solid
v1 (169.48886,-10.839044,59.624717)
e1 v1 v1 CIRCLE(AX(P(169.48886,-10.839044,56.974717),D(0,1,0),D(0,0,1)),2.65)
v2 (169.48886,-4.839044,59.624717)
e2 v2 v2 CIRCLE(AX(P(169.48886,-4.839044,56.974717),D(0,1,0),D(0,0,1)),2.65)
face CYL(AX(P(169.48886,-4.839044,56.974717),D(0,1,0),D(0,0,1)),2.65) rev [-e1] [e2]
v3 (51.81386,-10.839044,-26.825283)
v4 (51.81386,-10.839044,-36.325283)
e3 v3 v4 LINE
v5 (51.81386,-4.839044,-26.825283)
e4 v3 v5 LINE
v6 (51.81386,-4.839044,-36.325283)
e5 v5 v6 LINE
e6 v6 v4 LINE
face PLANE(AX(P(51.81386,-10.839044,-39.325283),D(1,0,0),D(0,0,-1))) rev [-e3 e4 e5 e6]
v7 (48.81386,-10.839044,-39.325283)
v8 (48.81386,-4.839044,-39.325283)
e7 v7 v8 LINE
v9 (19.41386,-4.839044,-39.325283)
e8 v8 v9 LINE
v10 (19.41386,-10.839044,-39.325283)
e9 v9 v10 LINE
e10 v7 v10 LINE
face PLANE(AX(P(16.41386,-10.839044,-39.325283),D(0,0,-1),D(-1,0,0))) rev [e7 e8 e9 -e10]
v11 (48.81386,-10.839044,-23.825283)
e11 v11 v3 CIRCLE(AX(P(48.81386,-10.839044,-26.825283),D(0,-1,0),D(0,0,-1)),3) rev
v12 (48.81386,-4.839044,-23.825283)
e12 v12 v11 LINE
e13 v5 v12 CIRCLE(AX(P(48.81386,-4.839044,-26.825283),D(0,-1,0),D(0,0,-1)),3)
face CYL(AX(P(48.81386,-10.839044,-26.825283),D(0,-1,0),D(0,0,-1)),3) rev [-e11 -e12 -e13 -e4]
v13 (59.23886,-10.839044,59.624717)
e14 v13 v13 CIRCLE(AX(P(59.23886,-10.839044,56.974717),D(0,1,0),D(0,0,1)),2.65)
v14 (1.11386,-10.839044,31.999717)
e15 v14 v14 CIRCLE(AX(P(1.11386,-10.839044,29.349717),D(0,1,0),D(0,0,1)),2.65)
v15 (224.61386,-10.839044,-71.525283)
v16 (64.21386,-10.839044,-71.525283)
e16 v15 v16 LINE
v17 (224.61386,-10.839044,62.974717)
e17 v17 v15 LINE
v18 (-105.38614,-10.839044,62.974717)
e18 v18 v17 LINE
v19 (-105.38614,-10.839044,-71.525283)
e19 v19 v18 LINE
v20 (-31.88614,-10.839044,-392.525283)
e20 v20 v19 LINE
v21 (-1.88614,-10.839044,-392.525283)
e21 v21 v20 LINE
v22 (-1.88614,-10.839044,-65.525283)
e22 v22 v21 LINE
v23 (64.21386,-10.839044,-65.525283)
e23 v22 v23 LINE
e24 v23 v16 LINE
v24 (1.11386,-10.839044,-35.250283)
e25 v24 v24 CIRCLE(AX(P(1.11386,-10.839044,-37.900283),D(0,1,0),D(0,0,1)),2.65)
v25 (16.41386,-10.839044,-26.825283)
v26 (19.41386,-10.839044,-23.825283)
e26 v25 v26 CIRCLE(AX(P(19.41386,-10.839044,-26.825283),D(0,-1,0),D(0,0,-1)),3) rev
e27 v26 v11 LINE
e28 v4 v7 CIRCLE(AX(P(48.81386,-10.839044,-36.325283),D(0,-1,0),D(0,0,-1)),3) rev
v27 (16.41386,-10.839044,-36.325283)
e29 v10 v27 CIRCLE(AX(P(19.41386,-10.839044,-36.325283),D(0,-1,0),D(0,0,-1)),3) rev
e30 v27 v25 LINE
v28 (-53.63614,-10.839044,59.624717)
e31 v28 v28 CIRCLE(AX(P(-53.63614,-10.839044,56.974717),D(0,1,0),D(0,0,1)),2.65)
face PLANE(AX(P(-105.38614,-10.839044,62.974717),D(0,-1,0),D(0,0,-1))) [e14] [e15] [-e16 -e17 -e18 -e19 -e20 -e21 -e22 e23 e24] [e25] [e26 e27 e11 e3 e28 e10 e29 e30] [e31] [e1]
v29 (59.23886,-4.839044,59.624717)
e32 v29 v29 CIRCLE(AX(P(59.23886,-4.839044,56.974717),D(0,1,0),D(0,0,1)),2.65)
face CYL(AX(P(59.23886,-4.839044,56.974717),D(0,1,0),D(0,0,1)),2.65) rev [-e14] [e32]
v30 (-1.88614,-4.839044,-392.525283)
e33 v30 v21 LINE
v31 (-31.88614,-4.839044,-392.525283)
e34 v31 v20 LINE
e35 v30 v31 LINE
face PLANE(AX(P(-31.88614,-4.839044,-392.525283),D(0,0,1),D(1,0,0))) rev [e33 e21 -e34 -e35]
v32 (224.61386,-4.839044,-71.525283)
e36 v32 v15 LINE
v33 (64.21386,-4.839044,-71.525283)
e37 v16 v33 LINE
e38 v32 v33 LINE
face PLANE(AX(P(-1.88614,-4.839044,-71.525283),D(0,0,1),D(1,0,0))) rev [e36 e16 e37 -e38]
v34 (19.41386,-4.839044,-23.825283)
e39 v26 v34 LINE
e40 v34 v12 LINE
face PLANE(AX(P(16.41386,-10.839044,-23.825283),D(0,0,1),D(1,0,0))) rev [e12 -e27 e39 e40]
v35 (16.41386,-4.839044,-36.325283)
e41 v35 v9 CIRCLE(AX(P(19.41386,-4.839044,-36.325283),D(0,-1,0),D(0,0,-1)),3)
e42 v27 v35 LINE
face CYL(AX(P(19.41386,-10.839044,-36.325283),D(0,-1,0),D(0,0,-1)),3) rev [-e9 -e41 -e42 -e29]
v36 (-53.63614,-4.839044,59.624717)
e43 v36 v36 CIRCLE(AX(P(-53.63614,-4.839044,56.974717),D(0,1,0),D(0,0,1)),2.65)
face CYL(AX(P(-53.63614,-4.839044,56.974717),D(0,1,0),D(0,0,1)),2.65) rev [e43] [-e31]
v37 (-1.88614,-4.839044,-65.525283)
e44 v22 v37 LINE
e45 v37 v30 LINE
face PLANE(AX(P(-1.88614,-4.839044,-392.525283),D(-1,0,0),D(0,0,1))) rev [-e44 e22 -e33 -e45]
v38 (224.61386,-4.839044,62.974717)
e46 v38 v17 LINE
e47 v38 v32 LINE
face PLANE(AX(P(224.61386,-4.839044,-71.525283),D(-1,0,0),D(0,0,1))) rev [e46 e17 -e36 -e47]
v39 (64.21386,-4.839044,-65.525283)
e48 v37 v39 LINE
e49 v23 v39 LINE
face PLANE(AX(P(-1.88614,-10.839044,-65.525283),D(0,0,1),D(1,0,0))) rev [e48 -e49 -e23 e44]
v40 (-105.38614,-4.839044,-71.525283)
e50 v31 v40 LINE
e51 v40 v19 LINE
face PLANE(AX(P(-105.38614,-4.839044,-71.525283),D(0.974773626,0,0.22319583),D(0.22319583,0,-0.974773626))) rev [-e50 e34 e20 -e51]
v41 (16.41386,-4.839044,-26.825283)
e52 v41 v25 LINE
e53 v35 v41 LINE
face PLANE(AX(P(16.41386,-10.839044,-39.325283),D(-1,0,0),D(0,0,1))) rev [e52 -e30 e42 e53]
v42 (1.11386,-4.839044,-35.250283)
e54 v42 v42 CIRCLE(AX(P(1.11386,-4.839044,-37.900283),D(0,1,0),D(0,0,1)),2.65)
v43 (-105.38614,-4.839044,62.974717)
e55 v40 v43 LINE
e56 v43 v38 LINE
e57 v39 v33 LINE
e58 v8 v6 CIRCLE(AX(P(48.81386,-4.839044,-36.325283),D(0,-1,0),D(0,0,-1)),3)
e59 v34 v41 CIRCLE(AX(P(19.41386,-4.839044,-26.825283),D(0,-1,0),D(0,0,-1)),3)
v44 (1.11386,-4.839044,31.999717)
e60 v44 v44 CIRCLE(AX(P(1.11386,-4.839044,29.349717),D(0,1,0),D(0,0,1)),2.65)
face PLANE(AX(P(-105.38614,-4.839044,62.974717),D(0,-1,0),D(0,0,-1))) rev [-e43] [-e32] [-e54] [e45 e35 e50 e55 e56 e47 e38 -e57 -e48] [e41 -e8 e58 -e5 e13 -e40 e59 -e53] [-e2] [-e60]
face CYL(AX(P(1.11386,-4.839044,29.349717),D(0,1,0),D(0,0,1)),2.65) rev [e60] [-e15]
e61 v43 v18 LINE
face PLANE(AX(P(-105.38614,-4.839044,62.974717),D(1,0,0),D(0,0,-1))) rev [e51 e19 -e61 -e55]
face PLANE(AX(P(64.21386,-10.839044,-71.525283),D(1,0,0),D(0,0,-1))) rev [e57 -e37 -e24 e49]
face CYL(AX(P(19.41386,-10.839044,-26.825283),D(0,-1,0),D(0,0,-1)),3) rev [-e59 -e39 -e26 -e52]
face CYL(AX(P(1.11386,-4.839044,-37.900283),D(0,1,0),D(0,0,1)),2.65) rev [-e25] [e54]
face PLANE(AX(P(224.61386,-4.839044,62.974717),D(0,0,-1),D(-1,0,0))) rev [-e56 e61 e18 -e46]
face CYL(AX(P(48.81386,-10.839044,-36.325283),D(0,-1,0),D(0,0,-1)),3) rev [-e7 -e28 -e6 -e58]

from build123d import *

# Parameters (mm, degrees)
LEG_START     = -10.839044341
LEG_OUTLINE_R = 2.65
LEG_DEPTH     = 6


# Read off the part's stored shape, not the designer's step: leg
with BuildPart() as part:
    # leg outline → leg (new body)
    with BuildSketch(Plane(origin=(0, 0, 0), x_dir=(1, 0, 0), z_dir=(0, 1, 0)).offset(LEG_START)):
        Polygon((-105.386140363, -62.9747167), (224.613859637, -62.9747167), (224.613859637, 71.5252833), (64.213859637, 71.5252833), (64.213859637, 65.5252833), (-1.886140363, 65.5252833), (-1.886140363, 392.5252833), (-31.886140363, 392.5252833), (-105.386140363, 71.5252833), align=None)
        with Locations((-53.636140363, -56.9747167)):
            Circle(LEG_OUTLINE_R, mode=Mode.SUBTRACT)
        with Locations((1.113859637, -29.3497167)):
            Circle(LEG_OUTLINE_R, mode=Mode.SUBTRACT)
        with Locations((59.238859637, -56.9747167)):
            Circle(LEG_OUTLINE_R, mode=Mode.SUBTRACT)
        with Locations((1.113859637, 37.9002833)):
            Circle(LEG_OUTLINE_R, mode=Mode.SUBTRACT)
        with BuildLine():
            Line((16.413859637, 26.8252833), (16.413859637, 36.3252833))
            ThreePointArc((16.413859637, 36.3252833), (17.292539294, 38.446603644), (19.413859637, 39.3252833))
            Line((19.413859637, 39.3252833), (48.813859637, 39.3252833))
            ThreePointArc((48.813859637, 39.3252833), (50.935179981, 38.446603644), (51.813859637, 36.3252833))
            Line((51.813859637, 36.3252833), (51.813859637, 26.8252833))
            ThreePointArc((51.813859637, 26.8252833), (50.93517998, 24.703962956), (48.813859637, 23.8252833))
            Line((48.813859637, 23.8252833), (19.413859637, 23.8252833))
            ThreePointArc((19.413859637, 23.8252833), (17.292539294, 24.703962957), (16.413859637, 26.8252833))
        make_face(mode=Mode.SUBTRACT)
        with Locations((169.488859637, -56.9747167)):
            Circle(LEG_OUTLINE_R, mode=Mode.SUBTRACT)
    extrude(amount=LEG_DEPTH)


solid = part.part
